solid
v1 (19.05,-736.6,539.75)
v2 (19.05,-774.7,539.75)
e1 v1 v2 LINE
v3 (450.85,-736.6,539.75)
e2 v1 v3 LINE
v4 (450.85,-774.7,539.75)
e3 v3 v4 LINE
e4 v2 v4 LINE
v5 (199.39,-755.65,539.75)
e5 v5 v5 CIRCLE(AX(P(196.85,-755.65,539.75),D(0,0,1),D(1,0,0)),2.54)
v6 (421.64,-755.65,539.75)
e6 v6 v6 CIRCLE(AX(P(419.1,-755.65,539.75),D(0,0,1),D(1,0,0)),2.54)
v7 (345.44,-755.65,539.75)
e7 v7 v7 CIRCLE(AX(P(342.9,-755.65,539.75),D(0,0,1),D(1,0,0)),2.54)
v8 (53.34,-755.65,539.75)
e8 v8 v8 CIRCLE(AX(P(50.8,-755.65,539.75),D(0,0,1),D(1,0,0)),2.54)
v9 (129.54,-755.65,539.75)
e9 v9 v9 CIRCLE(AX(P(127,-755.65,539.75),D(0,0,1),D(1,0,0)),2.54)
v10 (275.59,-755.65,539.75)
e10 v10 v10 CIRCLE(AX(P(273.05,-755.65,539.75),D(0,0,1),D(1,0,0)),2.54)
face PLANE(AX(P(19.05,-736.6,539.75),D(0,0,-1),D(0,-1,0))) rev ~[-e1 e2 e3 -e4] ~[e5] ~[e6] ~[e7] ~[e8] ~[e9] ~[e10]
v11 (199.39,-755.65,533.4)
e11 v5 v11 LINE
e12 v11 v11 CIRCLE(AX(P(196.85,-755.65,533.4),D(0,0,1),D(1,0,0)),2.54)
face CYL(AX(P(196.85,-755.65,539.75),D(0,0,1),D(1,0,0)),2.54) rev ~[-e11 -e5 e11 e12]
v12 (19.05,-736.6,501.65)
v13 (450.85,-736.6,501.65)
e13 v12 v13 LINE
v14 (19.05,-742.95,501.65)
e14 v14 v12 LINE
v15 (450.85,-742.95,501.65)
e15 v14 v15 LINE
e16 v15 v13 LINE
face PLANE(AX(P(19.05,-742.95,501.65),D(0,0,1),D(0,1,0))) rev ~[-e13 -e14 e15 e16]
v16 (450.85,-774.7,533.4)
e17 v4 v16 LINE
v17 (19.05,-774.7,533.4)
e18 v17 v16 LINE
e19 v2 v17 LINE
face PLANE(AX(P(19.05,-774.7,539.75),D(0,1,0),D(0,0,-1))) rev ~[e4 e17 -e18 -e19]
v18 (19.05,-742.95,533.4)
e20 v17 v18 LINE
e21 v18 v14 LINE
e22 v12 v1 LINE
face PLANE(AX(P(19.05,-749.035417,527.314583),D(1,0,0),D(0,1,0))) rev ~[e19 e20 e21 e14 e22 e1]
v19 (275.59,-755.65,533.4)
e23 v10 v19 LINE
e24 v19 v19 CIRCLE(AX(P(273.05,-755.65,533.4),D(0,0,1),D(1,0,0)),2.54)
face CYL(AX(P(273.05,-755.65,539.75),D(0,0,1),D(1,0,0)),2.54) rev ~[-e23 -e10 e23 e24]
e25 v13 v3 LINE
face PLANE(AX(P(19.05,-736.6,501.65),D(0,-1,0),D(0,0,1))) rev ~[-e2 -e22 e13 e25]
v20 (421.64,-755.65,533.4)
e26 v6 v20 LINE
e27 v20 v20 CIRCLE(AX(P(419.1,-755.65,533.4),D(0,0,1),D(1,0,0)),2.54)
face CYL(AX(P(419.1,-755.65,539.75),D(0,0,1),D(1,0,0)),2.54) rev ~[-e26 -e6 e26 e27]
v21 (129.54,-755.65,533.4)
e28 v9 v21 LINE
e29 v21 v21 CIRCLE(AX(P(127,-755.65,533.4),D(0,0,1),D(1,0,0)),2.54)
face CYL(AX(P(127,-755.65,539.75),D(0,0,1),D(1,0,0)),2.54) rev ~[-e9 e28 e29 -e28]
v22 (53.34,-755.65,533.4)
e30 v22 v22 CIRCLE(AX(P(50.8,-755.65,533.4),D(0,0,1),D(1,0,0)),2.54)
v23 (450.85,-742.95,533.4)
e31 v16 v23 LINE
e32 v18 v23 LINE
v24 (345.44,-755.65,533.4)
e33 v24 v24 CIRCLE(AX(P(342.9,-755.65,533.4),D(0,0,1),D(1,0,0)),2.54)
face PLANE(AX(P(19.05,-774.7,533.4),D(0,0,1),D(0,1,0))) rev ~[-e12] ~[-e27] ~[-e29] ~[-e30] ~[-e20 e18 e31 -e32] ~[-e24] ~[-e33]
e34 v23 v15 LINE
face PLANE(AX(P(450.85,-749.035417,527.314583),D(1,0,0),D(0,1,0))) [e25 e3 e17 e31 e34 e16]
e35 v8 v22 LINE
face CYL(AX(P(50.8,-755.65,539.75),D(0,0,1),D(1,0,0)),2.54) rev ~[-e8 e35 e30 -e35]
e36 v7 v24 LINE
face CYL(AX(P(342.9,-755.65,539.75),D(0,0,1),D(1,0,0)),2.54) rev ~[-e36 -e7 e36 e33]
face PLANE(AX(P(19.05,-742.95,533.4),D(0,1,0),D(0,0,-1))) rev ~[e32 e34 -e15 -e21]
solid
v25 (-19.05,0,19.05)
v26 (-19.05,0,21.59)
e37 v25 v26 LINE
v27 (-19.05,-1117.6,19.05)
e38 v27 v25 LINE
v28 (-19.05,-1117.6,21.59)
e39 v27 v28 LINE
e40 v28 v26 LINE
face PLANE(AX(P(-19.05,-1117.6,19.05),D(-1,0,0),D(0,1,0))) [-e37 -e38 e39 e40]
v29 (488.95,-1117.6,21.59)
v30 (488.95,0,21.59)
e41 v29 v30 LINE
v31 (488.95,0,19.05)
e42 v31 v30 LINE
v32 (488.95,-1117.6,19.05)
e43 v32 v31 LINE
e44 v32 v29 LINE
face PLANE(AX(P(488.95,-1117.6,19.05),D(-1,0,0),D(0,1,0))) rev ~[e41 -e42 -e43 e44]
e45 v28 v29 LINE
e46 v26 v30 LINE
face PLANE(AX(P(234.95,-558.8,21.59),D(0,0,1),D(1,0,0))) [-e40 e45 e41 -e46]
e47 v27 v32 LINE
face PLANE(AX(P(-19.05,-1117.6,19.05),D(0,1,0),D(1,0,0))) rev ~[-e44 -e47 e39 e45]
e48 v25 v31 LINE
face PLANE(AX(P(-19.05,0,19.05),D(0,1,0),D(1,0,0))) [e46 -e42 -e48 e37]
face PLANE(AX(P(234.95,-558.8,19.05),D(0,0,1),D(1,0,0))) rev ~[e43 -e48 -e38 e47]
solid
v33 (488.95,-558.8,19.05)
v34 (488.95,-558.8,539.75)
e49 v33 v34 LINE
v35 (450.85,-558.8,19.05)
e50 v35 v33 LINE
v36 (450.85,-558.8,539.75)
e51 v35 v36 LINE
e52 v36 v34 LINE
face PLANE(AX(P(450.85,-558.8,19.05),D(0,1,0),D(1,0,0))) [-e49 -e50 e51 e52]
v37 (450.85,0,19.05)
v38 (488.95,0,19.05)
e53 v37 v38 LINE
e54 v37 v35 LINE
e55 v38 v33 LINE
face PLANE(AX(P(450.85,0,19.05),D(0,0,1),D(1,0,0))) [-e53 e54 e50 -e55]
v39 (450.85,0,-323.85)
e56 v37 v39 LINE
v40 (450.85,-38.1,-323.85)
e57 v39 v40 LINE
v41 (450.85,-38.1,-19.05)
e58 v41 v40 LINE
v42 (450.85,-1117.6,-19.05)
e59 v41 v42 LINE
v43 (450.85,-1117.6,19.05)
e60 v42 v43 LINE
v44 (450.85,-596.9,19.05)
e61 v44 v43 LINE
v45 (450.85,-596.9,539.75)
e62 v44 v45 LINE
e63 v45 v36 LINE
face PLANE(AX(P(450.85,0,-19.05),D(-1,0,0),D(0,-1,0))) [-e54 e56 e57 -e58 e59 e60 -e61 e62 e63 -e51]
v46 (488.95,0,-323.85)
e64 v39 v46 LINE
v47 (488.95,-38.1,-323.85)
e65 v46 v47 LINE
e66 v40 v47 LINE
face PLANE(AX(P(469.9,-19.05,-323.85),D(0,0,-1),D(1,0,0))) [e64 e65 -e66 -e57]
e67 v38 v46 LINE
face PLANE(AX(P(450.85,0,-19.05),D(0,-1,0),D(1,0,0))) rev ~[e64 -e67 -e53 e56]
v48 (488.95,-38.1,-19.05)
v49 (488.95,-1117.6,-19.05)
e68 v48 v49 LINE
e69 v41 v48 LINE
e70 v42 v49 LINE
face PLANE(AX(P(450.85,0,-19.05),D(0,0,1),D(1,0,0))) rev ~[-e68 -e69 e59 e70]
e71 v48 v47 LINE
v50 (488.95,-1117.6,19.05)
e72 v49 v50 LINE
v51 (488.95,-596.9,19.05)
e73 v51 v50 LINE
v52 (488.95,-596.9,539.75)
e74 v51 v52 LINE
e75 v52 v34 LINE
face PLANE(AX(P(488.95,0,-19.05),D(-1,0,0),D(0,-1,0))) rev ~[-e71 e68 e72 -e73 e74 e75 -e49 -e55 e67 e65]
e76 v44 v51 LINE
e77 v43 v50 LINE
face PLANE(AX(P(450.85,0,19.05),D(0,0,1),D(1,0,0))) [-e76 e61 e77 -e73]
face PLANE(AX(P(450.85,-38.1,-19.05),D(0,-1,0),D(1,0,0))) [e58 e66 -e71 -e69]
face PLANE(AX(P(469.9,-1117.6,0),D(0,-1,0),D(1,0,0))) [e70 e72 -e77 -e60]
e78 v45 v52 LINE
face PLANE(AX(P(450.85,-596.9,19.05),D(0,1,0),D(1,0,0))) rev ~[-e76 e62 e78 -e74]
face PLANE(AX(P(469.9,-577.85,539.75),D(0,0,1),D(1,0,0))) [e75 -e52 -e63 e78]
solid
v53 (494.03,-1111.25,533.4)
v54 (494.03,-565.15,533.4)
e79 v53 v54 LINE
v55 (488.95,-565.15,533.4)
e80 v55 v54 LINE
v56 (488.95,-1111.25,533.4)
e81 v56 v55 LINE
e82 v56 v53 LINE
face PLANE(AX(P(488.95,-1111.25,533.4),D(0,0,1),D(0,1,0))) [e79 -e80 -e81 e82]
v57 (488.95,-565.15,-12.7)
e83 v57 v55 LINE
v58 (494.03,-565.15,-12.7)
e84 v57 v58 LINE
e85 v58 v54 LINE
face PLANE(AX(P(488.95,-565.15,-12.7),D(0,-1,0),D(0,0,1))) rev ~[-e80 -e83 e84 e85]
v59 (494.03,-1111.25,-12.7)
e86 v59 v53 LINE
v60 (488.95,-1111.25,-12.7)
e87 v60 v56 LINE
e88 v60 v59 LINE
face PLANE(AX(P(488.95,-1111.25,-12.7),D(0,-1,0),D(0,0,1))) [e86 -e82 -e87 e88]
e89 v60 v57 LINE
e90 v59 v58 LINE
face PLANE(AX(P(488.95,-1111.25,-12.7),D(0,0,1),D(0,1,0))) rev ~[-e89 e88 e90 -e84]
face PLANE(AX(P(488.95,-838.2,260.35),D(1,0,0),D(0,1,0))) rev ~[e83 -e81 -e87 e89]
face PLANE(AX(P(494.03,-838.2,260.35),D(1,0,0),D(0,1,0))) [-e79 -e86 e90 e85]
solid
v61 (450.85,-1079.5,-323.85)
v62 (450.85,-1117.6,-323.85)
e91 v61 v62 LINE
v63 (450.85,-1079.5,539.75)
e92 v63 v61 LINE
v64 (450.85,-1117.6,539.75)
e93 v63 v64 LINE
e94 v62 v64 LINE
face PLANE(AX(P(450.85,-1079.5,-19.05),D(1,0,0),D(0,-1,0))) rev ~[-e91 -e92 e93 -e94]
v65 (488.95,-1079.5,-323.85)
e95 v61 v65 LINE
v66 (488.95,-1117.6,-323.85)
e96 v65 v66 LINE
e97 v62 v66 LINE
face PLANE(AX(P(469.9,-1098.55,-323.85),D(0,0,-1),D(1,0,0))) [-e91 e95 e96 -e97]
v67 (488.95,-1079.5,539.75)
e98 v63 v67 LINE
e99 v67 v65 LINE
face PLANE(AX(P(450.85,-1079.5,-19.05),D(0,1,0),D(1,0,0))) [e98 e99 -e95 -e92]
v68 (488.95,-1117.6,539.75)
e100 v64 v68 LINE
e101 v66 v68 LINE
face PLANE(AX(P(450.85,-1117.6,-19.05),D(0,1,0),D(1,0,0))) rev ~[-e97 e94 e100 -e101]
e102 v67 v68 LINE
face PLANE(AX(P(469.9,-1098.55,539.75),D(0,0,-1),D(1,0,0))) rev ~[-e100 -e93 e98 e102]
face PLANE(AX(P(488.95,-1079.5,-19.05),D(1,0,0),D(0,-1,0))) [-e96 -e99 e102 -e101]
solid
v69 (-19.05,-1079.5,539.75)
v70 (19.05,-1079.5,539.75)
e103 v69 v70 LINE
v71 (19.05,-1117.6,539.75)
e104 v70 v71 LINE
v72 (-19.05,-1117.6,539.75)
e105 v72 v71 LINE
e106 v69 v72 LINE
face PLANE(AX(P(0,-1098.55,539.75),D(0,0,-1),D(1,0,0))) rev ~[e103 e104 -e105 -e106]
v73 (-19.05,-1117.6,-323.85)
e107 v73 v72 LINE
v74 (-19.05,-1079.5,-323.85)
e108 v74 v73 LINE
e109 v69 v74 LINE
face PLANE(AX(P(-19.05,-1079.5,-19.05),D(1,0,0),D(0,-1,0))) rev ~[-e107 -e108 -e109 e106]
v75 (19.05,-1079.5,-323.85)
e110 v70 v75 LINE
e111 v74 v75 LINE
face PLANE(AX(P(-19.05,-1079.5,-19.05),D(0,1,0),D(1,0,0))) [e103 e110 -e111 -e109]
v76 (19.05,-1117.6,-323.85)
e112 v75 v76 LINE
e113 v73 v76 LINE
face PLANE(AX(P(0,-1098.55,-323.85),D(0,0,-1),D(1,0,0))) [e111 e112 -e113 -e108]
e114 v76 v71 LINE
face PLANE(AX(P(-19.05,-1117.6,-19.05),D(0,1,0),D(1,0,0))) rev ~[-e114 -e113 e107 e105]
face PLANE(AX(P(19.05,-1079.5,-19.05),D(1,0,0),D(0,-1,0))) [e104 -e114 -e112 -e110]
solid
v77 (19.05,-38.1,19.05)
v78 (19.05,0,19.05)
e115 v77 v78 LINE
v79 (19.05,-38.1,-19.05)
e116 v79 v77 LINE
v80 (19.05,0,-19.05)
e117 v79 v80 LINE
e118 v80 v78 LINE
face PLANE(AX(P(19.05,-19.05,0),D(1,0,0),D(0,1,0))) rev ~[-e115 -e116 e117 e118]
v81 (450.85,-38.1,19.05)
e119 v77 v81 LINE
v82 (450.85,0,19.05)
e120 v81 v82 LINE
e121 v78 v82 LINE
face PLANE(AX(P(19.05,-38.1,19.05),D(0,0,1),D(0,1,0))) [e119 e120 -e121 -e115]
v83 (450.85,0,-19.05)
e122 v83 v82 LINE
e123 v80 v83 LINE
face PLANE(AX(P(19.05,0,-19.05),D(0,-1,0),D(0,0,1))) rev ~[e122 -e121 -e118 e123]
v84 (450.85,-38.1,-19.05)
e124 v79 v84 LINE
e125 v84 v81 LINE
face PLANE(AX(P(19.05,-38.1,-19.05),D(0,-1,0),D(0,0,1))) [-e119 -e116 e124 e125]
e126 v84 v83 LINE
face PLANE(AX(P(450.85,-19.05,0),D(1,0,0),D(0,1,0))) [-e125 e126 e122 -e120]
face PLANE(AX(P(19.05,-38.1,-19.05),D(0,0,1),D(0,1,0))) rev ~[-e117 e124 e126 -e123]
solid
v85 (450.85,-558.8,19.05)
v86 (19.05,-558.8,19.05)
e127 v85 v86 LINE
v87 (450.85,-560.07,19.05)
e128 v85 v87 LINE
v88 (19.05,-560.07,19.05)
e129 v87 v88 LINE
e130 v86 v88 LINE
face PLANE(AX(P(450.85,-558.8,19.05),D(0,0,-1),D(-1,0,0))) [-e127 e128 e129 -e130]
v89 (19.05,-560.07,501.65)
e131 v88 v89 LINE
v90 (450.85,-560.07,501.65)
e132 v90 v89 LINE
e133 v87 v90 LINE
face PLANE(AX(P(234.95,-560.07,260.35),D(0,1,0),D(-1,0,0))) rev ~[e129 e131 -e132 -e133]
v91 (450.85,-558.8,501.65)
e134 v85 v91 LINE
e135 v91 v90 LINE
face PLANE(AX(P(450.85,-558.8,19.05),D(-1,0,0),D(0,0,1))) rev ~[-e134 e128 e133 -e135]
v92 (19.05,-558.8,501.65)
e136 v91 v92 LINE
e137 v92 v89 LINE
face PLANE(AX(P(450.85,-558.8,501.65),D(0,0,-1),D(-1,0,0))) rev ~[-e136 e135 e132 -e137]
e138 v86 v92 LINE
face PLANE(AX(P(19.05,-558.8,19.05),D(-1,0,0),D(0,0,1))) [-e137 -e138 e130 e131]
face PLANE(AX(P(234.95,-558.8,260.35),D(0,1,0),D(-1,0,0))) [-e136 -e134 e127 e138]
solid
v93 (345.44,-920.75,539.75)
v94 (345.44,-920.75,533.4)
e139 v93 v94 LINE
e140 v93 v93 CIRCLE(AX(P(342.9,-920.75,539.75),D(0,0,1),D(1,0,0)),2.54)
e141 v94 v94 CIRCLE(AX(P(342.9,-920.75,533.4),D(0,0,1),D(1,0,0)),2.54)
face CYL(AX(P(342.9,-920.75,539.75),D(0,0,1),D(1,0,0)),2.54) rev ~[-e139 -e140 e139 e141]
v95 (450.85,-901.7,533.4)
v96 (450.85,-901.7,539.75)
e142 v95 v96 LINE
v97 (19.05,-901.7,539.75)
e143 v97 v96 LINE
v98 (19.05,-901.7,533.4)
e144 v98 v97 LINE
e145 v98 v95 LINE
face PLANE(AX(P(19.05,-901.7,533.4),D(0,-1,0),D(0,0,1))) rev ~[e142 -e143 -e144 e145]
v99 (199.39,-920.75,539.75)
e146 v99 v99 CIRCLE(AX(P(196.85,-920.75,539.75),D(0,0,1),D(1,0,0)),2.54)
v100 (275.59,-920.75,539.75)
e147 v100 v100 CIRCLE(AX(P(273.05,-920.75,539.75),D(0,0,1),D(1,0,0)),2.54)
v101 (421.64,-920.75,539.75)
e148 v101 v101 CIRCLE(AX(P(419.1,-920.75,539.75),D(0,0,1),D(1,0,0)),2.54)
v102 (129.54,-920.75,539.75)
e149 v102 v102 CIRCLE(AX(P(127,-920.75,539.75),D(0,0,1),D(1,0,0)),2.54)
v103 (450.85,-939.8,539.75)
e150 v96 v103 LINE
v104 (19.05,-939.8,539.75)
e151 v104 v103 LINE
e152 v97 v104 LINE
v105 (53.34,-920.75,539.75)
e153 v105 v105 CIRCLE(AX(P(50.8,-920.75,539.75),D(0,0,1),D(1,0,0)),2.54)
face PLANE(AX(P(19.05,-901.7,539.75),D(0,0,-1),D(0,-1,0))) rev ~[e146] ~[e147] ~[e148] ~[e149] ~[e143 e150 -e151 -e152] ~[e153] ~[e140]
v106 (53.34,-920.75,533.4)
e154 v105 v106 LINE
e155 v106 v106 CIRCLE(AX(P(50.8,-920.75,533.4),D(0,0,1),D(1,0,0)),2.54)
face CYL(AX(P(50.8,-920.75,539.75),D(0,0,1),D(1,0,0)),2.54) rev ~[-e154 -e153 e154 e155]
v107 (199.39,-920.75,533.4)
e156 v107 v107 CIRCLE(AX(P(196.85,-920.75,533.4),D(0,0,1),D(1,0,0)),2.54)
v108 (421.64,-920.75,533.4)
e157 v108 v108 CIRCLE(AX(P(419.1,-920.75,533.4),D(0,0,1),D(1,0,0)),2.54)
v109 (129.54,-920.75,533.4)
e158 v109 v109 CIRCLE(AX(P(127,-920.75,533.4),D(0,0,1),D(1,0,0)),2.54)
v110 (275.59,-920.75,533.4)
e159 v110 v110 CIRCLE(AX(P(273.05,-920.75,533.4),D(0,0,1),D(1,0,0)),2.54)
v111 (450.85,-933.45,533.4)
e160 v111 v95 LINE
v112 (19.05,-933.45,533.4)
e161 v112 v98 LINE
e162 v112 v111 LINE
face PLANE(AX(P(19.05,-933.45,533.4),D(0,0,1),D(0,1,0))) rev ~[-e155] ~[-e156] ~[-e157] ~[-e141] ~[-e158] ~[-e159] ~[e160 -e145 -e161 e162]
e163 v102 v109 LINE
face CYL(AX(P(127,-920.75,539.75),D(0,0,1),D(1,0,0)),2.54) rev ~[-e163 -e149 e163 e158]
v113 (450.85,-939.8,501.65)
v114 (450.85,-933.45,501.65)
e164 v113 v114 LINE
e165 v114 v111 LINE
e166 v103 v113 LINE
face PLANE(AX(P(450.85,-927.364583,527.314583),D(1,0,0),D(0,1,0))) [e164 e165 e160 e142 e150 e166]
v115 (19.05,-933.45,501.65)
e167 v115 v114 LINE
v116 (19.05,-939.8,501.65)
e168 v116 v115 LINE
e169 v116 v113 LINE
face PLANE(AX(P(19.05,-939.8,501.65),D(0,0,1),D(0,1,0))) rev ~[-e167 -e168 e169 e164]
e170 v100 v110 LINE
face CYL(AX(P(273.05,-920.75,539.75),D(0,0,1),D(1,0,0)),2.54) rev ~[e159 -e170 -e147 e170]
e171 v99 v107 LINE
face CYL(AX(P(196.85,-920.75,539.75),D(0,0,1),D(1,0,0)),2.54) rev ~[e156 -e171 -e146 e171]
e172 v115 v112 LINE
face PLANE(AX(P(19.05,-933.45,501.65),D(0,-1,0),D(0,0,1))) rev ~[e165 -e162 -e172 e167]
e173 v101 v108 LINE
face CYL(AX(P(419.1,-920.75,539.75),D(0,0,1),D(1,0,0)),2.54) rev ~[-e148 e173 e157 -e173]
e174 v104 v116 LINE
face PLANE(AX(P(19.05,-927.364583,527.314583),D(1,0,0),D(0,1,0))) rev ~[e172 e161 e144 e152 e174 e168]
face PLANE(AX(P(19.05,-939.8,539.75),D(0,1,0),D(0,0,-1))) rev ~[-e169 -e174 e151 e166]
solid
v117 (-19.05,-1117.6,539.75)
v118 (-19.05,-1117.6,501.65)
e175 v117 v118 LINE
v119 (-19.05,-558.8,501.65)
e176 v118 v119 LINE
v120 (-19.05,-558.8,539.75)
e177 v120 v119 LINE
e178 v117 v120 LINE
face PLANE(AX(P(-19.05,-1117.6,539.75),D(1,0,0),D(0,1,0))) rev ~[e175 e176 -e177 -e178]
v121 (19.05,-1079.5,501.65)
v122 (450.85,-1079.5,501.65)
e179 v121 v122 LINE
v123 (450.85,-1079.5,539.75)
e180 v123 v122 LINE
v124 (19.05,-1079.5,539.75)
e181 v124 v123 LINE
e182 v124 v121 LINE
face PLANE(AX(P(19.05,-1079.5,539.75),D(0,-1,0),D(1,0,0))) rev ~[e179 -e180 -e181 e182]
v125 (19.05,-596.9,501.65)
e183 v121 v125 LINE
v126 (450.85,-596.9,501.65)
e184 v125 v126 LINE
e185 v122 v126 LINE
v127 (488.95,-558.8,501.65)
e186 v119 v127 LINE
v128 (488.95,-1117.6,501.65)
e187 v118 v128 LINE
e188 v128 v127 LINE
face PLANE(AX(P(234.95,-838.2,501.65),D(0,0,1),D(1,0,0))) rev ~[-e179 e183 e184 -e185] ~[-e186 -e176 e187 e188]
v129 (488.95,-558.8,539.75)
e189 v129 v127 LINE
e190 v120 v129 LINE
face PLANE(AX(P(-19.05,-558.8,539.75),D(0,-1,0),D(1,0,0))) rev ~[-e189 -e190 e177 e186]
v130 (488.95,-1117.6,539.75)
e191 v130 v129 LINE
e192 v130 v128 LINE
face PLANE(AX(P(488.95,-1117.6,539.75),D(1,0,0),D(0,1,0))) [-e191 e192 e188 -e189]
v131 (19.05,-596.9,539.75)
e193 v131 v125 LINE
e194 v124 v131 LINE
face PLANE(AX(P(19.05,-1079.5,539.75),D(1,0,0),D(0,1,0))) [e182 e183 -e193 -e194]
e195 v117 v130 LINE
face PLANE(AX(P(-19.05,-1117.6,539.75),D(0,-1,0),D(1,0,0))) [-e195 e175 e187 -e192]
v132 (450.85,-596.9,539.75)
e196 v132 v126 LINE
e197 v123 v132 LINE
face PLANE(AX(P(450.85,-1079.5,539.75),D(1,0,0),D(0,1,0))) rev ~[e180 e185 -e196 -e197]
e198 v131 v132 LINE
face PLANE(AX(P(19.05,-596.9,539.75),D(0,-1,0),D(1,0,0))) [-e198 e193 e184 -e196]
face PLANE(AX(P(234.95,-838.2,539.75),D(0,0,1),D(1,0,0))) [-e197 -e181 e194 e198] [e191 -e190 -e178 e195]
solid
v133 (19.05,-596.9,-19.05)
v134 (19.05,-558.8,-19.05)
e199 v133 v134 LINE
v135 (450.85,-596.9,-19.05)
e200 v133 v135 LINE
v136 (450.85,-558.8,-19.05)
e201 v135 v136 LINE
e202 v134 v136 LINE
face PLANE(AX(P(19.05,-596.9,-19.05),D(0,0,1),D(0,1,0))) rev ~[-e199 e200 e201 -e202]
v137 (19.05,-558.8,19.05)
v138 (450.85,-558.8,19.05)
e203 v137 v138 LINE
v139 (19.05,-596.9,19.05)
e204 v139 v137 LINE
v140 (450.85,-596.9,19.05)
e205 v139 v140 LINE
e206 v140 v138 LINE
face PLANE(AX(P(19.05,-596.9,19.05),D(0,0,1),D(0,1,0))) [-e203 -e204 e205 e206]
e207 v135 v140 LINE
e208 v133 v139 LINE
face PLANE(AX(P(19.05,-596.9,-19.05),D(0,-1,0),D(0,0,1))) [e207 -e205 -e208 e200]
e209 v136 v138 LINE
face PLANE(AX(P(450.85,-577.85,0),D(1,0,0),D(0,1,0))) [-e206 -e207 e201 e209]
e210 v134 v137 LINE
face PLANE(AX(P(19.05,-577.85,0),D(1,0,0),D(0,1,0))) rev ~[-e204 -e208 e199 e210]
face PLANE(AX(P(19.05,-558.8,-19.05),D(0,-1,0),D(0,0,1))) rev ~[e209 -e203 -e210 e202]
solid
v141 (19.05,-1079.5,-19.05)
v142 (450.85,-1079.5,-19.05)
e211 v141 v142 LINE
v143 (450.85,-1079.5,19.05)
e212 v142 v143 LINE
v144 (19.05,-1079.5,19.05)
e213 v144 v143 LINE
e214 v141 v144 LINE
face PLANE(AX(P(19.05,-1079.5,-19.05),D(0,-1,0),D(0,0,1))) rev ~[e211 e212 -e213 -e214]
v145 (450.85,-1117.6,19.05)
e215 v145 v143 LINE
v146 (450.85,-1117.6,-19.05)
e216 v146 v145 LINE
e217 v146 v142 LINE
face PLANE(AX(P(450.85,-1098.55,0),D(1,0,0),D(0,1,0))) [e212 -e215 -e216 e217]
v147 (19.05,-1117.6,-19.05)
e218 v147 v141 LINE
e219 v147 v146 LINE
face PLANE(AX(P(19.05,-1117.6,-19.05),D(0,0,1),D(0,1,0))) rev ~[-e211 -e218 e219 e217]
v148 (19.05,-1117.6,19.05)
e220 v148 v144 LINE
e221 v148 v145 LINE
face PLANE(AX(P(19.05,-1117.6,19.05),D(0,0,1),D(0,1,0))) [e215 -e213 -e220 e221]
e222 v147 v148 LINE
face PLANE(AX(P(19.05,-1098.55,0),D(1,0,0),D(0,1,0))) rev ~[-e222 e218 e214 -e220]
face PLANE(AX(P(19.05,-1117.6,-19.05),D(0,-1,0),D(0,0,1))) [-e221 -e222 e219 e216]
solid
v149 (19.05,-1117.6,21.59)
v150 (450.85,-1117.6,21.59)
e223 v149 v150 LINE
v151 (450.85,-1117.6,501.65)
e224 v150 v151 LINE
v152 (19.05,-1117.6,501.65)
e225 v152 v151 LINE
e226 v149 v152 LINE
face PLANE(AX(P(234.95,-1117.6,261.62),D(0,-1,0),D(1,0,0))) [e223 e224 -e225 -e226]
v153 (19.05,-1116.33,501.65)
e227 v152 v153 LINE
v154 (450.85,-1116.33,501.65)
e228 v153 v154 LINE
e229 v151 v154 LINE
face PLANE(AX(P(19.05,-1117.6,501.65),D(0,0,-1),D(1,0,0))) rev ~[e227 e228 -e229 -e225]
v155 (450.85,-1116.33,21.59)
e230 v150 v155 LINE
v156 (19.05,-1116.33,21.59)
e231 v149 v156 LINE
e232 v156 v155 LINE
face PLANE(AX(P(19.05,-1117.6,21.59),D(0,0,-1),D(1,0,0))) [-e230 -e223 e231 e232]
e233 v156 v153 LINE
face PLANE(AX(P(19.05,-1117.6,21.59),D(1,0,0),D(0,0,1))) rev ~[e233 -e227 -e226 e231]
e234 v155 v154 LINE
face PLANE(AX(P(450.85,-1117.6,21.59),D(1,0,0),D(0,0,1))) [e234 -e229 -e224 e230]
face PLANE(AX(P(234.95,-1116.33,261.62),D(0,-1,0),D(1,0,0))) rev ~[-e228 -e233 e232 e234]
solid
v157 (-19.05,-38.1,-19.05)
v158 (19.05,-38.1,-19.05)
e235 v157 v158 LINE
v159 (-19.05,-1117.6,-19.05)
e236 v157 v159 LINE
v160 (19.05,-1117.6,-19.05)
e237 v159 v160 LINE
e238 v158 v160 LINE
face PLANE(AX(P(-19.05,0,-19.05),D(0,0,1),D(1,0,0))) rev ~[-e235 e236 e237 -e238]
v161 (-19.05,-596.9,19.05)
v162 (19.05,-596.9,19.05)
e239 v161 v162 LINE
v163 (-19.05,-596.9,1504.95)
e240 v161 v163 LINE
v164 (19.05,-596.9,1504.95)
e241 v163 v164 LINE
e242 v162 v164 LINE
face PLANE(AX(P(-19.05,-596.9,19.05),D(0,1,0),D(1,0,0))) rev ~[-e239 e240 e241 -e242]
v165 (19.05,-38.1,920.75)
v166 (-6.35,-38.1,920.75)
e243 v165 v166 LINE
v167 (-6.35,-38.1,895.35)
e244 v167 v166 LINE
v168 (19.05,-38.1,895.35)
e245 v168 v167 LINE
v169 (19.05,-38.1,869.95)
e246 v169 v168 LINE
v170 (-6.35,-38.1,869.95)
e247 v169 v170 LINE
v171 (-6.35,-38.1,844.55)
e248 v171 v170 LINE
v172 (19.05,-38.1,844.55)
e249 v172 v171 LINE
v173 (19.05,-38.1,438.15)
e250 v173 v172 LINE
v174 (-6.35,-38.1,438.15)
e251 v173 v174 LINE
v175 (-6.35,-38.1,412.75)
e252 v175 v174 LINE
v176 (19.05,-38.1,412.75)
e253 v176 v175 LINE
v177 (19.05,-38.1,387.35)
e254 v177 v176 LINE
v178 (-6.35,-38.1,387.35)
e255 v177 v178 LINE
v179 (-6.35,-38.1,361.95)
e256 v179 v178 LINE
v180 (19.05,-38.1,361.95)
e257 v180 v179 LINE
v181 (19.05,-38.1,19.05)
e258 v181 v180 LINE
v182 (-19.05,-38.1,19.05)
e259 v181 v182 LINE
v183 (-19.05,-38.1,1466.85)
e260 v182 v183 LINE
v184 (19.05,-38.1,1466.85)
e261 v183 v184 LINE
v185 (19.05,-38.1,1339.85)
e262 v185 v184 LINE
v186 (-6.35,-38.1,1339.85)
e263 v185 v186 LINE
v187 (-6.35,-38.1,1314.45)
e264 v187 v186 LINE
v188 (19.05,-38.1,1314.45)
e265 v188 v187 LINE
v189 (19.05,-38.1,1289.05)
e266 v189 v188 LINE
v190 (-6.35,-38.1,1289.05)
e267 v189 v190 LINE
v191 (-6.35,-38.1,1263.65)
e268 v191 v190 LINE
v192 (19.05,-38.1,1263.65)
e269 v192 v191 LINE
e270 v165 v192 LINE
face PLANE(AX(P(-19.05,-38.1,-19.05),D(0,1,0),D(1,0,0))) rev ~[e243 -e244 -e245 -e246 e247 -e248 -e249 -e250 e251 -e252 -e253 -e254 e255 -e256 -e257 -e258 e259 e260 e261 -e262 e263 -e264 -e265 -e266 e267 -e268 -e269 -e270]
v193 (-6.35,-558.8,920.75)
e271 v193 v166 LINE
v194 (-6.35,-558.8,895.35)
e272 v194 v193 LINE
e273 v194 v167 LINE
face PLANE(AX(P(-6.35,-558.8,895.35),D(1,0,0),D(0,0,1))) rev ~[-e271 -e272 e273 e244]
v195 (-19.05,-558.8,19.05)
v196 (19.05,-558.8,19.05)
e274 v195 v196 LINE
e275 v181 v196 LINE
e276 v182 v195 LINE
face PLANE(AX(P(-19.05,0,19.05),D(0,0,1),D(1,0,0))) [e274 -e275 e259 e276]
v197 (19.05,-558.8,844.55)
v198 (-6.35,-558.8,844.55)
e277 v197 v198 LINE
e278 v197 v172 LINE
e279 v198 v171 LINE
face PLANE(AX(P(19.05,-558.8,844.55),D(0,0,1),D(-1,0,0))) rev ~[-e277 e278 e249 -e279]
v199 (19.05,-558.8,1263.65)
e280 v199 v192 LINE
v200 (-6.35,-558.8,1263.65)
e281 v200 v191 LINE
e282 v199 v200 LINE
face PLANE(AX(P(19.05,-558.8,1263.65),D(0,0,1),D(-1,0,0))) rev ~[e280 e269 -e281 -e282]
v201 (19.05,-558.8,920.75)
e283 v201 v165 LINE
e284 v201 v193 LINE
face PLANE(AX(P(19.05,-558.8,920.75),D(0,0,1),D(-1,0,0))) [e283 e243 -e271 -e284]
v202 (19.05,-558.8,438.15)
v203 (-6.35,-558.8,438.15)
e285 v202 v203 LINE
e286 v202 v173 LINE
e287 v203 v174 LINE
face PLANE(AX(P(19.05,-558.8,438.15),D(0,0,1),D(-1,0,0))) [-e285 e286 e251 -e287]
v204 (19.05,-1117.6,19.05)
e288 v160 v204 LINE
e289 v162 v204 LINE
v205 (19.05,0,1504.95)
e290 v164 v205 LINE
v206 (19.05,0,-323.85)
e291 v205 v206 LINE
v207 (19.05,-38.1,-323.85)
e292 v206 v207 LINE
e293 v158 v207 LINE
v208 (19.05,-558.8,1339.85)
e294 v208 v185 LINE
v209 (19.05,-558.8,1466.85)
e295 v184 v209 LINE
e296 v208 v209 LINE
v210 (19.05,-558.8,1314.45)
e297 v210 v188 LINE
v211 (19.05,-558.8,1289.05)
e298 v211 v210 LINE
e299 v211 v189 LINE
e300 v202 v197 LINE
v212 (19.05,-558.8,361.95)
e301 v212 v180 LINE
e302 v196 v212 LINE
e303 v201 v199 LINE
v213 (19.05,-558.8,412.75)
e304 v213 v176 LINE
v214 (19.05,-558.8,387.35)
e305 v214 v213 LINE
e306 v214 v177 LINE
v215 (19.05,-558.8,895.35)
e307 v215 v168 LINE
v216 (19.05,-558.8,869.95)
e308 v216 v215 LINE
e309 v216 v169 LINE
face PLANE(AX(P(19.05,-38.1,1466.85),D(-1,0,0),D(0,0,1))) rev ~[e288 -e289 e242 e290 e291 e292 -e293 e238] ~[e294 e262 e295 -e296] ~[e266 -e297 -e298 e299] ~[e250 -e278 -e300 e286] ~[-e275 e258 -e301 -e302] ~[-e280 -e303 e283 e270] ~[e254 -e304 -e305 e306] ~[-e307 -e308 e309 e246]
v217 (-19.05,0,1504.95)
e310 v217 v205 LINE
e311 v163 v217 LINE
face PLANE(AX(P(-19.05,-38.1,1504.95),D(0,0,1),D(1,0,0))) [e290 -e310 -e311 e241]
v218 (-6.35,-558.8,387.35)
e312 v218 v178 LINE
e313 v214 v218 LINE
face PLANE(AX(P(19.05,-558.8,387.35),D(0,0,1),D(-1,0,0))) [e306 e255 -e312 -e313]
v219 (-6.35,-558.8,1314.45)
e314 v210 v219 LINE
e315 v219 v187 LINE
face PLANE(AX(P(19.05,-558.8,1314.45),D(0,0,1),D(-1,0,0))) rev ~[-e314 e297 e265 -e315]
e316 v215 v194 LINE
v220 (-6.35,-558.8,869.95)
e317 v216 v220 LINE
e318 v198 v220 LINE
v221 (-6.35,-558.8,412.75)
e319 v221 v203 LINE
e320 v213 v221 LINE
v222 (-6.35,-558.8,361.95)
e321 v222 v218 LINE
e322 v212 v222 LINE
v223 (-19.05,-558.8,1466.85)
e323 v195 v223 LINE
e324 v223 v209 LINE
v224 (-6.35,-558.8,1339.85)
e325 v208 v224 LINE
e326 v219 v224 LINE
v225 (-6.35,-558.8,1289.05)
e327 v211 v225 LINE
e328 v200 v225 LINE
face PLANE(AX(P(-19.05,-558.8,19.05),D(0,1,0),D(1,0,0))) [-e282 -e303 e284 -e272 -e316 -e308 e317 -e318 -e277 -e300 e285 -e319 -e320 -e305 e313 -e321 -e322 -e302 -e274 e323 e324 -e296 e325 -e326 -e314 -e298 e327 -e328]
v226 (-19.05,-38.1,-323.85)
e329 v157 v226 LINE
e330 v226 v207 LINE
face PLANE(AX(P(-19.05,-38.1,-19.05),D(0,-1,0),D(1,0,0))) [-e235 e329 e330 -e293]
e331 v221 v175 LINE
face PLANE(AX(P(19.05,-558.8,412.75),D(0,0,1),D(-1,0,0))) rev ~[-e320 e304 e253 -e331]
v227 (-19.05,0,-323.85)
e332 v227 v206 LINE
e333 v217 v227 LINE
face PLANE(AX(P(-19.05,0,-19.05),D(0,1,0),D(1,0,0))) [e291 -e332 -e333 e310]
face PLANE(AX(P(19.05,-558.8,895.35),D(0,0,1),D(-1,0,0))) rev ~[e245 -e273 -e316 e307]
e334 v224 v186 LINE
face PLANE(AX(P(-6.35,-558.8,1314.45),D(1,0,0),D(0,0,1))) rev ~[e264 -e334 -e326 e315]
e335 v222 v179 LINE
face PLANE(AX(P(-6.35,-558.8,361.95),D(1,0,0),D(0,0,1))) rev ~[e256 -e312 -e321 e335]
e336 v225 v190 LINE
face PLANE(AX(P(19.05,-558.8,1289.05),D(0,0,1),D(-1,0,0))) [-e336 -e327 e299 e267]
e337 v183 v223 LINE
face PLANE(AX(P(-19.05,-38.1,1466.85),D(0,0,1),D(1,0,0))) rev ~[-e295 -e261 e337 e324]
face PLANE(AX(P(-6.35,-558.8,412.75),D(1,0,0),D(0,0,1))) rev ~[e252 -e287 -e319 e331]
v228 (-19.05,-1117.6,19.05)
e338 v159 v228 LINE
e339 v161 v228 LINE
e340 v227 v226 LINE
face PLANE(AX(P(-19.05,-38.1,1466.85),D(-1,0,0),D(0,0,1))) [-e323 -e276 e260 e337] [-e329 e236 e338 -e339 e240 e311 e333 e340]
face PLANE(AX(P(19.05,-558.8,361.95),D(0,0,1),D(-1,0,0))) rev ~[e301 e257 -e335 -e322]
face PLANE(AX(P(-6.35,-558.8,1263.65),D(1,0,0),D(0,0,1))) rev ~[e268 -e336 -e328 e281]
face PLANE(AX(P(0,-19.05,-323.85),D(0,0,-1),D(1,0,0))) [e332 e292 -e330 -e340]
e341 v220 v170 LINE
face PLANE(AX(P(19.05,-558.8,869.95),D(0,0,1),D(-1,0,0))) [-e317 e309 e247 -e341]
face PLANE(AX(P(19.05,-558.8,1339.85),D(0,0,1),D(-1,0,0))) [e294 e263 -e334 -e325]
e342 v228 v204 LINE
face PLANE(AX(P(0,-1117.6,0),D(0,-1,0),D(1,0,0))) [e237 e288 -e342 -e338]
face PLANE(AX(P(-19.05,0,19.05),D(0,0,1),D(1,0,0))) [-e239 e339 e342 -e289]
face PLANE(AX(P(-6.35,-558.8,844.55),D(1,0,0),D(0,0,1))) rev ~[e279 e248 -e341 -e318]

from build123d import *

# Parameters (mm, degrees)
F0_W          = 38.1
F0_H          = 38.1
F1_DEPTH      = 1117.6
F2_W          = 38.1
F2_H          = 38.1
F3_DEPTH      = 304.8
F3_DEPTH_BACK = 558.8
F4_W          = 38.1
F4_H          = 38.1
F5_DEPTH      = 304.8
F5_DEPTH_BACK = 1524
F6_W          = 38.1
F6_H          = 38.1
F7_DEPTH      = 1485.9
F8_W          = 38.1
F8_H          = 38.1
F9_DEPTH      = 431.8
F10_W         = 38.1
F10_H         = 38.1
F11_DEPTH     = 304.8
F12_W         = 38.1
F12_H         = 38.1
F13_DEPTH     = 520.7
F14_W         = 508
F14_H         = 558.8
F14_W_2       = 431.8
F14_H_2       = 482.6
F15_DEPTH     = 38.1
F16_W         = 38.1
F16_H         = 38.1
F17_DEPTH     = 431.8
F18_W         = 38.1
F18_H         = 38.1
F19_DEPTH     = 520.7
F21_DEPTH     = 431.8
F24_W         = 508
F24_H         = 1117.6
F25_DEPTH     = 2.54
F26_W         = 431.8
F26_H         = 482.6
F27_DEPTH     = 1.27
F28_W         = 431.8
F28_H         = 480.06
F29_DEPTH     = 1.27
F30_W         = 546.1
F30_H         = 546.1
F31_DEPTH     = 5.08
F32_W         = 25.4
F32_H         = 25.4
F33_DEPTH     = 520.7
F34_R         = 2.54
F35_DEPTH     = 6.35


with BuildPart() as f1:
    # F0 (on Front) → F1 (new body)
    with BuildSketch(Plane.XZ):
        Rectangle(F0_W, F0_H)
    extrude(amount=F1_DEPTH)

    # F4 (on face) → F5 (join, two sides)
    with BuildSketch(Plane(origin=(0, 0, -19.05), x_dir=(1, 0, 0), z_dir=(0, 0, -1))) as f5_sk:
        with Locations((0, 19.05)):
            Rectangle(F4_W, F4_H)
    extrude(amount=F5_DEPTH)
    extrude(f5_sk.sketch, amount=-F5_DEPTH_BACK)

    # F6 (on face) → F7 (join, through all)
    with BuildSketch(Plane.XY.offset(19.05)):
        with Locations((0, -577.85)):
            Rectangle(F6_W, F6_H)
    extrude(amount=F7_DEPTH)

    # F18 (on face) → F19 (join, through all)
    with BuildSketch(Plane.XZ.offset(38.1)):
        with Locations((0, 1485.9)):
            Rectangle(F18_W, F18_H)
    extrude(amount=F19_DEPTH)

    # F32 (on face) → F33 (join, through all)
    with BuildSketch(Plane(origin=(0, -558.8, 0), x_dir=(-1, 0, 0), z_dir=(0, 1, 0))):
        with Locations((-6.35, 425.45)):
            Rectangle(F32_W, F32_H)
        with Locations((-6.35, 908.05)):
            Rectangle(F32_W, F32_H)
        with Locations((-6.35, 1327.15)):
            Rectangle(F32_W, F32_H)
        with Locations((-6.35, 1276.35)):
            Rectangle(F32_W, F32_H)
        with Locations((-6.35, 857.25)):
            Rectangle(F32_W, F32_H)
        with Locations((-6.35, 374.65)):
            Rectangle(F32_W, F32_H)
    extrude(amount=F33_DEPTH)


with BuildPart() as f1b:
    # F0 (on Front) → F1, piece 2 (new body)
    with BuildSketch(Plane.XZ):
        with Locations((469.9, 0)):
            Rectangle(F0_W, F0_H)
    extrude(amount=F1_DEPTH)

    # F10 (on face) → F11 (join, through all)
    with BuildSketch(Plane(origin=(0, 0, -19.05), x_dir=(1, 0, 0), z_dir=(0, 0, -1))):
        with Locations((469.9, 19.05)):
            Rectangle(F10_W, F10_H)
    extrude(amount=F11_DEPTH)

    # F12 (on face) → F13 (join, through all)
    with BuildSketch(Plane.XY.offset(19.05)):
        with Locations((469.9, -577.85)):
            Rectangle(F12_W, F12_H)
    extrude(amount=F13_DEPTH)


with BuildPart() as f3:
    # F2 (on face) → F3 (new body, two sides)
    with BuildSketch(Plane(origin=(0, 0, -19.05), x_dir=(1, 0, 0), z_dir=(0, 0, -1))) as f3_sk:
        with Locations((469.9, 1098.55)):
            Rectangle(F2_W, F2_H)
    extrude(amount=F3_DEPTH)
    extrude(f3_sk.sketch, amount=-F3_DEPTH_BACK)


with BuildPart() as f3b:
    # F2 (on face) → F3, piece 2 (new body, two sides)
    with BuildSketch(Plane(origin=(0, 0, -19.05), x_dir=(1, 0, 0), z_dir=(0, 0, -1))) as f3_2_sk:
        with Locations((0, 1098.55)):
            Rectangle(F2_W, F2_H)
    extrude(amount=F3_DEPTH)
    extrude(f3_2_sk.sketch, amount=-F3_DEPTH_BACK)


with BuildPart() as f9:
    # F8 (on face) → F9 (new body, through all)
    with BuildSketch(Plane.YZ.offset(19.05)):
        with Locations((-1098.55, 0)):
            Rectangle(F8_W, F8_H)
    extrude(amount=F9_DEPTH)


with BuildPart() as f9b:
    # F8 (on face) → F9, piece 2 (new body, through all)
    with BuildSketch(Plane.YZ.offset(19.05)):
        with Locations((-19.05, 0)):
            Rectangle(F8_W, F8_H)
    extrude(amount=F9_DEPTH)


with BuildPart() as f15:
    # F14 (on face) → F15 (new body)
    with BuildSketch(Plane.XY.offset(539.75)):
        with Locations((234.95, -838.2)):
            Rectangle(F14_W, F14_H)
        with Locations((234.95, -838.2)):
            Rectangle(F14_W_2, F14_H_2, mode=Mode.SUBTRACT)
    extrude(amount=-F15_DEPTH)


with BuildPart() as f17:
    # F16 (on face) → F17 (new body, through all)
    with BuildSketch(Plane.YZ.offset(19.05)):
        with Locations((-577.85, 0)):
            Rectangle(F16_W, F16_H)
    extrude(amount=F17_DEPTH)


with BuildPart() as f21:
    # F20 (on face) → F21 (new body, through all)
    with BuildSketch(Plane.YZ.offset(19.05)):
        Polygon((-736.6, 501.65), (-736.6, 539.75), (-774.7, 539.75), (-774.7, 533.4), (-742.95, 533.4), (-742.95, 501.65), align=None)
    extrude(amount=F21_DEPTH)


with BuildPart() as f21b:
    # F20 (on face) → F21, piece 2 (new body, through all)
    with BuildSketch(Plane.YZ.offset(19.05)):
        Polygon((-901.7, 539.75), (-939.8, 539.75), (-939.8, 501.65), (-933.45, 501.65), (-933.45, 533.4), (-901.7, 533.4), align=None)
    extrude(amount=F21_DEPTH)


with BuildPart() as f25:
    # F24 (on face) → F25 (new body)
    with BuildSketch(Plane.XY.offset(19.05)):
        with Locations((234.95, -558.8)):
            Rectangle(F24_W, F24_H)
    extrude(amount=F25_DEPTH)


with BuildPart() as f27:
    # F26 (on face) → F27 (new body)
    with BuildSketch(Plane(origin=(0, -558.8, 0), x_dir=(-1, 0, 0), z_dir=(0, 1, 0))):
        with Locations((-234.95, 260.35)):
            Rectangle(F26_W, F26_H)
    extrude(amount=-F27_DEPTH)


with BuildPart() as f29:
    # F28 (on face) → F29 (new body)
    with BuildSketch(Plane.XZ.offset(1117.6)):
        with Locations((234.95, 261.62)):
            Rectangle(F28_W, F28_H)
    extrude(amount=-F29_DEPTH)


with BuildPart() as f31:
    # F30 (on face) → F31 (new body)
    with BuildSketch(Plane.YZ.offset(488.95)):
        with Locations((-838.2, 260.35)):
            Rectangle(F30_W, F30_H)
    extrude(amount=F31_DEPTH)


with BuildPart() as f35_tool:
    # F34 (on face) → F35 (new body, through all)
    with BuildSketch(Plane.XY.offset(539.75)):
        with Locations((50.8, -755.65)):
            Circle(F34_R)
        with Locations((127, -755.65)):
            Circle(F34_R)
        with Locations((196.85, -755.65)):
            Circle(F34_R)
        with Locations((273.05, -755.65)):
            Circle(F34_R)
        with Locations((342.9, -755.65)):
            Circle(F34_R)
        with Locations((419.1, -755.65)):
            Circle(F34_R)
        with Locations((50.8, -920.75)):
            Circle(F34_R)
        with Locations((127, -920.75)):
            Circle(F34_R)
        with Locations((196.85, -920.75)):
            Circle(F34_R)
        with Locations((273.05, -920.75)):
            Circle(F34_R)
        with Locations((342.9, -920.75)):
            Circle(F34_R)
        with Locations((419.1, -920.75)):
            Circle(F34_R)
    extrude(amount=-F35_DEPTH)


with BuildPart() as f21_1:
    add(f21.part)

    # F35: cut by f35_tool
    add(f35_tool.part, mode=Mode.SUBTRACT)


with BuildPart() as f21b_1:
    add(f21b.part)

    # F35: cut by f35_tool
    add(f35_tool.part, mode=Mode.SUBTRACT)


solid = Compound([f1.part, f1b.part, f3.part, f3b.part, f9.part, f9b.part, f15.part, f17.part, f25.part, f27.part, f29.part, f31.part, f21_1.part, f21b_1.part])
